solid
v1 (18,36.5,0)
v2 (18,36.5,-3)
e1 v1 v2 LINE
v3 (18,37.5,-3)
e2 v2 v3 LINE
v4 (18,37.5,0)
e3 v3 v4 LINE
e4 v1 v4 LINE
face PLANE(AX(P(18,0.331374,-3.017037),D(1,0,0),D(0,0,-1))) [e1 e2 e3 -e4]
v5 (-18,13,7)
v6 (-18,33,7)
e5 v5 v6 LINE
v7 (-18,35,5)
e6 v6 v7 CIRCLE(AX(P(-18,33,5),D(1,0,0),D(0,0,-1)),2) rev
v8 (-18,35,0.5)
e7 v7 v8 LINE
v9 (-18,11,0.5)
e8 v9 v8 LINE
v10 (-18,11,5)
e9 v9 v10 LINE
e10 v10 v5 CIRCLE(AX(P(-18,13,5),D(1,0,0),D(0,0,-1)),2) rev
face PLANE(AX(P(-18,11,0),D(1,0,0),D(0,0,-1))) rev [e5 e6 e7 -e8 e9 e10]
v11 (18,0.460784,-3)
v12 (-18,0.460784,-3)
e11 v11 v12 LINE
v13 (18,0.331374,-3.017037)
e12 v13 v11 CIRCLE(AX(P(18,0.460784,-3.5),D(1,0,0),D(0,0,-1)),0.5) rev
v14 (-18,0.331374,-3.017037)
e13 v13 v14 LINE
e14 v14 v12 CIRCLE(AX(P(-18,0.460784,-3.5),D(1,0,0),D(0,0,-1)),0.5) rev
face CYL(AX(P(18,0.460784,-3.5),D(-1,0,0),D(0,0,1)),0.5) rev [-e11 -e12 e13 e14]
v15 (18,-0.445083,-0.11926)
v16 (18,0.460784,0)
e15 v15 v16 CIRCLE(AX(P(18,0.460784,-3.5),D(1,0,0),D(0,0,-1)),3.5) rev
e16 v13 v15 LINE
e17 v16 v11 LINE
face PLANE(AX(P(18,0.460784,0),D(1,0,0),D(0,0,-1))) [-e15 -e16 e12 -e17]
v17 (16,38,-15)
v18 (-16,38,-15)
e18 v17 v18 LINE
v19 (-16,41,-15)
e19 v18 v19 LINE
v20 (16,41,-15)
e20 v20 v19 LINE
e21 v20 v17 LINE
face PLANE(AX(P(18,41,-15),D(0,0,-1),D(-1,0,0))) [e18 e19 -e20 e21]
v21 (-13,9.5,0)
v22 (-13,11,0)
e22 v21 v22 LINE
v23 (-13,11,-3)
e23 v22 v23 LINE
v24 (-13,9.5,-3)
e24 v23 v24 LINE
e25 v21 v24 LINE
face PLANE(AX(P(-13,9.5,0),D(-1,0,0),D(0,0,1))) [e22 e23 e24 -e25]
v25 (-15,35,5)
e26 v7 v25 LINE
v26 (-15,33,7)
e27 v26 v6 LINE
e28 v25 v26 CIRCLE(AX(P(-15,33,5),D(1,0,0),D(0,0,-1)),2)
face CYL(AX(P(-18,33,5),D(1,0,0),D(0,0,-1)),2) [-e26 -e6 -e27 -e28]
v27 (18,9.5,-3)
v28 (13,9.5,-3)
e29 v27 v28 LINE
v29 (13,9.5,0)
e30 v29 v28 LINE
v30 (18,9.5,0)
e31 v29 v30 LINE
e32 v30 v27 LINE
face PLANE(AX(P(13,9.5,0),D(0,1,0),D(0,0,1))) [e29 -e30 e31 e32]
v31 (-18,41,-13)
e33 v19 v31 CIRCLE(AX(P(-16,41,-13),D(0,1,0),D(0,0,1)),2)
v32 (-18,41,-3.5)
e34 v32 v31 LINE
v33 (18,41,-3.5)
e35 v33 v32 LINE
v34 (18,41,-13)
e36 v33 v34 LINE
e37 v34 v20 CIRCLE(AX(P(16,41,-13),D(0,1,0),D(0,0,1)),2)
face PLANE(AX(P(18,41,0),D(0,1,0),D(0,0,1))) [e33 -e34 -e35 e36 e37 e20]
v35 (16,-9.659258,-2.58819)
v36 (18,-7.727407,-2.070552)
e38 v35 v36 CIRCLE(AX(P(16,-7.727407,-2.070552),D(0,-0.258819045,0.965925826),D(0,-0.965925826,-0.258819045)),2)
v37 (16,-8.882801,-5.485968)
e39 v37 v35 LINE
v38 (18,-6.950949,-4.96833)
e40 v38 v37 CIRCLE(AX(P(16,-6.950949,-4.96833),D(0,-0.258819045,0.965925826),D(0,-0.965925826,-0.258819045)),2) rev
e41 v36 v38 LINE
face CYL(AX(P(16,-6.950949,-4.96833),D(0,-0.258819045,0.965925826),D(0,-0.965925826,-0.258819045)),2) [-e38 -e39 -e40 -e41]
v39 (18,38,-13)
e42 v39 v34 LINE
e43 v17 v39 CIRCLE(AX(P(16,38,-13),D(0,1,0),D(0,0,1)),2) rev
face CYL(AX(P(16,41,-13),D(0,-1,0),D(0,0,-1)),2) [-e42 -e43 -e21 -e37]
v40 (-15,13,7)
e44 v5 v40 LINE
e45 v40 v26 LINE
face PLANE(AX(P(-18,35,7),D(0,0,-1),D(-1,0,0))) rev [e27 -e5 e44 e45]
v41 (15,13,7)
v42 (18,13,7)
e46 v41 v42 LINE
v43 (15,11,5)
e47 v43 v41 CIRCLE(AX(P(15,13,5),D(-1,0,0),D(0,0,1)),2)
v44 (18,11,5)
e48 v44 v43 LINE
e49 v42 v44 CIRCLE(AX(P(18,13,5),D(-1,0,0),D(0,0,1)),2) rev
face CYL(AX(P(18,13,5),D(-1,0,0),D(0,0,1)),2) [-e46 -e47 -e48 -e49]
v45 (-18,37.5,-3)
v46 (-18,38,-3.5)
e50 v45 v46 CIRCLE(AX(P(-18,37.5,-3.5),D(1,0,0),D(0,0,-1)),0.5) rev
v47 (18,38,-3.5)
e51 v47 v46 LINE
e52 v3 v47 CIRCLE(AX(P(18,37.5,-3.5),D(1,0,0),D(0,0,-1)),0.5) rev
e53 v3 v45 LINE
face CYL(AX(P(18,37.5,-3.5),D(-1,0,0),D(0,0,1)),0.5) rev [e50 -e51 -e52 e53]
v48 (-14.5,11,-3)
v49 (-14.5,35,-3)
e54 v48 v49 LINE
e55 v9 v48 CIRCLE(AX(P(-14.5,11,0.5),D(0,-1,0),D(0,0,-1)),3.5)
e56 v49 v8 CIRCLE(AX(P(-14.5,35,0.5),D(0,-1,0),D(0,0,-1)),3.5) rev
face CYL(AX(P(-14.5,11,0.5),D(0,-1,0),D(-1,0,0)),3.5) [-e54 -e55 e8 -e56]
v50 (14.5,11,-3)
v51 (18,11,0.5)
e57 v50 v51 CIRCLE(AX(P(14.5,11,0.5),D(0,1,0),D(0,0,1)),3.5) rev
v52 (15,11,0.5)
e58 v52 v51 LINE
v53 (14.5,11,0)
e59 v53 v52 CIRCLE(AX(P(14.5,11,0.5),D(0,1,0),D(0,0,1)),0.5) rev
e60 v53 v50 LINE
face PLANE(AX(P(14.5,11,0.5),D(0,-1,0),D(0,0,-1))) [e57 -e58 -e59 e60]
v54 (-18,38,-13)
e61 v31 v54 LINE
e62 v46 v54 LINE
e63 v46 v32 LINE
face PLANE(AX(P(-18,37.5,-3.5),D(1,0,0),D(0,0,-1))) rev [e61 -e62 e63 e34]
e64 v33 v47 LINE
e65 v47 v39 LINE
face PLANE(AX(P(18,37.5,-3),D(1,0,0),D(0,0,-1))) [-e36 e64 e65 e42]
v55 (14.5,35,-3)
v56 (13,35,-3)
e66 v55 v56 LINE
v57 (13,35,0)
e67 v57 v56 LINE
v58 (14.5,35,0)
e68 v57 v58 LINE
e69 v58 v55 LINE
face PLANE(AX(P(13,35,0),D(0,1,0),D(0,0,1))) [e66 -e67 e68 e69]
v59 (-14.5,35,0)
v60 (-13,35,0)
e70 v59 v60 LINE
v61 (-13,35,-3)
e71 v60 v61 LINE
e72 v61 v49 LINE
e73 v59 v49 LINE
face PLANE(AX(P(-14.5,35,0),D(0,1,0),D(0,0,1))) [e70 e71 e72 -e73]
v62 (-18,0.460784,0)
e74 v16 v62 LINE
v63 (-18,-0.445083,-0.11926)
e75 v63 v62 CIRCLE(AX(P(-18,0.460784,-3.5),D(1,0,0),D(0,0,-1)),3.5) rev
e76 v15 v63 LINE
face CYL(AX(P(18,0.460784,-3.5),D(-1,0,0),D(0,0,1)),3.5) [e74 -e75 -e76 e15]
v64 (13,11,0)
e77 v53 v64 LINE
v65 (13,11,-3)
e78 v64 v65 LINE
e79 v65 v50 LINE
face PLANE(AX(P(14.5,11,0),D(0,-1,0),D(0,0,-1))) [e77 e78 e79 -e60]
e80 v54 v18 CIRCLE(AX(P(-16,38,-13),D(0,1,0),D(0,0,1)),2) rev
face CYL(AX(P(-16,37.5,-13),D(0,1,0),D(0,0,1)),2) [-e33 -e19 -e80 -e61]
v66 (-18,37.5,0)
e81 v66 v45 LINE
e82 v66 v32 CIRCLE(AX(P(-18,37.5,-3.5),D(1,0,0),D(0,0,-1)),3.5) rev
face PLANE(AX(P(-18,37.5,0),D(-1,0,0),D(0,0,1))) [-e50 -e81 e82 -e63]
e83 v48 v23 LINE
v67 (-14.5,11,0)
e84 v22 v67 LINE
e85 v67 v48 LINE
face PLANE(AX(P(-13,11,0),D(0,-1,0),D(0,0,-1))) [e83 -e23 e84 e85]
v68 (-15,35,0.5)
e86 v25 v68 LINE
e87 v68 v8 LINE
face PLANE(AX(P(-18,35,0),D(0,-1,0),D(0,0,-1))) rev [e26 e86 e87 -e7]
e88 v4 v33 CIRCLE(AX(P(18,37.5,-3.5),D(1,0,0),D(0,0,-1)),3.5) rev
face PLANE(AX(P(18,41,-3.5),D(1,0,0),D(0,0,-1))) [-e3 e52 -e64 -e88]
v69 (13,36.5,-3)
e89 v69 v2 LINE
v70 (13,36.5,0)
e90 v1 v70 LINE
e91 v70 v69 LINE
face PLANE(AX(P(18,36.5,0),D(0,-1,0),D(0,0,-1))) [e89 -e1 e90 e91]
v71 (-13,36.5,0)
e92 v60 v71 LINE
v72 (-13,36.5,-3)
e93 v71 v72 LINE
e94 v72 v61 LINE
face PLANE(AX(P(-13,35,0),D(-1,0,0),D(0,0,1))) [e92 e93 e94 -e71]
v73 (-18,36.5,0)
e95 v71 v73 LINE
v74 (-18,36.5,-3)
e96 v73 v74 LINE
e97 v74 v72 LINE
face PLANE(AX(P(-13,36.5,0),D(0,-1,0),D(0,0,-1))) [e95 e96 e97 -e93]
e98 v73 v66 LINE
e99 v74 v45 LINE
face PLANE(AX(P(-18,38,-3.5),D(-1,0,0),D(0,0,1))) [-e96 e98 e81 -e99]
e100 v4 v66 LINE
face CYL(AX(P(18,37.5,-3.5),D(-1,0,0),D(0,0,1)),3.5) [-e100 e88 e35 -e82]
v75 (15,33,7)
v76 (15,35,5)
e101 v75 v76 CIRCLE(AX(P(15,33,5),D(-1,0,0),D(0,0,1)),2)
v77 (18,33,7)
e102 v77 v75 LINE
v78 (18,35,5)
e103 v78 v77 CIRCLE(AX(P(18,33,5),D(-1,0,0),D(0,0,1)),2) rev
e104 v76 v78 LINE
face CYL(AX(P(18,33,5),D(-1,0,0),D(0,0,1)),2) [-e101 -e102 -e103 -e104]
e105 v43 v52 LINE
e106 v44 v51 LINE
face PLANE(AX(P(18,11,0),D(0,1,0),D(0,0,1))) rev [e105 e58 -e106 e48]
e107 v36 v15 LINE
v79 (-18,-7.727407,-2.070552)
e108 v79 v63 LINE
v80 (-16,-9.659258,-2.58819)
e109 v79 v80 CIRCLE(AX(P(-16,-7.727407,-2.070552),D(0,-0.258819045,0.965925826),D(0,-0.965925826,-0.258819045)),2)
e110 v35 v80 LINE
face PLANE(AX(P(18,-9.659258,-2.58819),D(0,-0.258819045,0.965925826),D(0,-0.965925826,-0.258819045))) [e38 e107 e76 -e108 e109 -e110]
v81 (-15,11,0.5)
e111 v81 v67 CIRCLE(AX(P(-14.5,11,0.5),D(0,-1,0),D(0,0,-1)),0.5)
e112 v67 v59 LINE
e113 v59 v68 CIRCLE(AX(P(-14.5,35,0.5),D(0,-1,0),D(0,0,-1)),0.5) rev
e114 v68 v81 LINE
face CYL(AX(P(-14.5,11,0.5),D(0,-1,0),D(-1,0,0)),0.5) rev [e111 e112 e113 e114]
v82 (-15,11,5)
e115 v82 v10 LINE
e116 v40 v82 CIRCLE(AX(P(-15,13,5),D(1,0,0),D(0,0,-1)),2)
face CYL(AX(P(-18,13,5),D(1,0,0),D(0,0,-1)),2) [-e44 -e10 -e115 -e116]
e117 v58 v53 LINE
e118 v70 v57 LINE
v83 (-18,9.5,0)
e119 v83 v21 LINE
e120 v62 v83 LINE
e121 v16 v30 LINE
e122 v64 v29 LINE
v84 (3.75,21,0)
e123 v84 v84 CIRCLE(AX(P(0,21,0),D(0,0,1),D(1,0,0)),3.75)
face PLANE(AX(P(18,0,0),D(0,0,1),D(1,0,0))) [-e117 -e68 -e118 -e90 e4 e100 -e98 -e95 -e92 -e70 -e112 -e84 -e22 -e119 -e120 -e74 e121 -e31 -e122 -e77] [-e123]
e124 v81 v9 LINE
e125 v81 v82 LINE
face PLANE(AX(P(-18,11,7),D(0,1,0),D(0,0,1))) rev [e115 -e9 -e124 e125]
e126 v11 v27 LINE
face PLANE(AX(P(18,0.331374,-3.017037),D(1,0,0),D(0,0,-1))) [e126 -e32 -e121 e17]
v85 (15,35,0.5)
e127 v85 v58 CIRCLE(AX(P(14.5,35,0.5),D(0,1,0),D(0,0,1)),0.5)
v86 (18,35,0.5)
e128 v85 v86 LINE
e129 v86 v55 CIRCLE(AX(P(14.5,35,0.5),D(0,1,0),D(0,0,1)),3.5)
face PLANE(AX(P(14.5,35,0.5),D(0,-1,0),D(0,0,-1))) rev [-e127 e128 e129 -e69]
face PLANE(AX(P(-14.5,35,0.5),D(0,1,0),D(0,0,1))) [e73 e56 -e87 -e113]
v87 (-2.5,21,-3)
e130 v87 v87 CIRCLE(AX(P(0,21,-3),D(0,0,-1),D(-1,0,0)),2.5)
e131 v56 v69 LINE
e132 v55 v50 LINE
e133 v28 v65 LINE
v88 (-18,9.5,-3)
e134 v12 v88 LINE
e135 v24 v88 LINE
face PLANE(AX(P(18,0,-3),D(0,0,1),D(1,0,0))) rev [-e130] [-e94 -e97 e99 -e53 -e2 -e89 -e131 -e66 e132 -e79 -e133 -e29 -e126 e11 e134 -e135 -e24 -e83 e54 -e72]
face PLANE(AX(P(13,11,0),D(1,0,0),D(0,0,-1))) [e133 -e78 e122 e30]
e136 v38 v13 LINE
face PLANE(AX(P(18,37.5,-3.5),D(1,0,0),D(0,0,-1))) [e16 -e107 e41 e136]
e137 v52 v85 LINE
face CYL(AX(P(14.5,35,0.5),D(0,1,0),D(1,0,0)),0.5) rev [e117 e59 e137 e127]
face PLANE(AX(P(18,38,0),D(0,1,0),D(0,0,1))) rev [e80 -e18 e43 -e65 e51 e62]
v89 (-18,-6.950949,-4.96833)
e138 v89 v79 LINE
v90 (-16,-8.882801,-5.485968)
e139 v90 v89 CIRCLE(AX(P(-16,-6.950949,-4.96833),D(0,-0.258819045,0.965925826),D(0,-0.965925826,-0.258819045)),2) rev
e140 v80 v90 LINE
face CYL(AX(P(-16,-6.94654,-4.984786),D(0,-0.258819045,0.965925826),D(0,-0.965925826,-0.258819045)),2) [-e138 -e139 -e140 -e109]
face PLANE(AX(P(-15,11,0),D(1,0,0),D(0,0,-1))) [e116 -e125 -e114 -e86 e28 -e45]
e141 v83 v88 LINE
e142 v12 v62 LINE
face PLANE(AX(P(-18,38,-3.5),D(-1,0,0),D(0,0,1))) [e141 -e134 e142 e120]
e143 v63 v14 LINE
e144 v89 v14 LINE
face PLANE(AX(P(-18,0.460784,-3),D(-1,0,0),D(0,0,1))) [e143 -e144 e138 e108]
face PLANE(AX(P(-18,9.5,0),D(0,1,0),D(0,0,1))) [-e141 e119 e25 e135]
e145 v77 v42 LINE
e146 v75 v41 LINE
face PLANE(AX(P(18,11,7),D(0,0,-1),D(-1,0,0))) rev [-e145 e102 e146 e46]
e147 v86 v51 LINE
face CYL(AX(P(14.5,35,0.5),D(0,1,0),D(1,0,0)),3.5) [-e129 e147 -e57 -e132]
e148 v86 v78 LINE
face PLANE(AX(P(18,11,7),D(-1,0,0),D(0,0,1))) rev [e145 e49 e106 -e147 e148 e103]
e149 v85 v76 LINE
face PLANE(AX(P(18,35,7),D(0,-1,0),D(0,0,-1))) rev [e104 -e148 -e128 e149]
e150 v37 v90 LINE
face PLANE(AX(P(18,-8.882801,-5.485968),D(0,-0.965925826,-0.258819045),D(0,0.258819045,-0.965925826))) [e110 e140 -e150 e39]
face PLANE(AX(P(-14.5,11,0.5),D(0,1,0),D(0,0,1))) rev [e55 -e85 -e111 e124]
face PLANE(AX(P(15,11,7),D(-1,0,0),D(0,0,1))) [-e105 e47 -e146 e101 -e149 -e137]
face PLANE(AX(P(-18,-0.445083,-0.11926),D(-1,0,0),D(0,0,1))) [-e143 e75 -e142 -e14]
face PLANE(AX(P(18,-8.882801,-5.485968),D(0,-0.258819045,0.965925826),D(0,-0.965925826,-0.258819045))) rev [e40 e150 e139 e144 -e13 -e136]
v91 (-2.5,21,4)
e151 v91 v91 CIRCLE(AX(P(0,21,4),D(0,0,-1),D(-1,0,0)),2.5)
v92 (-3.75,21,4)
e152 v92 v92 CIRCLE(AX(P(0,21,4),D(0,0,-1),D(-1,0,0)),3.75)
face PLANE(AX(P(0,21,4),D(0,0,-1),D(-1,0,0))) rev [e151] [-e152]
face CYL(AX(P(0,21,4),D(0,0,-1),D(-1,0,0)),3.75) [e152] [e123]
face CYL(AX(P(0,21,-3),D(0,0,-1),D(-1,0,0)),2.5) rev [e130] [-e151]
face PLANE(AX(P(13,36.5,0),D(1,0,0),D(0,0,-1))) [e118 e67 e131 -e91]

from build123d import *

# Parameters (mm, degrees)
SM_BASE_FLANGE_1_DEPTH            = 18
SM_EDGE_FLANGE_1_STRIP_W          = 13
SM_EDGE_FLANGE_1_STRIP_H          = 3
SM_EDGE_FLANGE_1_STRIP_CUT_DEPTH  = 24
SM_EDGE_FLANGE_1_RELIEF_W         = 14.5
SM_EDGE_FLANGE_1_RELIEF_H         = 1.5
SM_EDGE_FLANGE_1_RELIEF_CUT_DEPTH = 3
SM_EDGE_FLANGE_1_DEPTH            = 24
SM_EDGE_FLANGE_2_STRIP_W          = 13
SM_EDGE_FLANGE_2_STRIP_H          = 3
SM_EDGE_FLANGE_2_STRIP_CUT_DEPTH  = 24
SM_EDGE_FLANGE_2_RELIEF_W         = 14.5
SM_EDGE_FLANGE_2_RELIEF_H         = 1.5
SM_EDGE_FLANGE_2_RELIEF_CUT_DEPTH = 3
SM_EDGE_FLANGE_2_DEPTH            = 24
SKETCH_12_R                       = 3.75
EXTRUDE_1_DEPTH                   = 7
HOLE_WIZARD_M6_1_D                = 5
HOLE_WIZARD_M6_1_DEPTH            = 15
HOLE_WIZARD_M6_1_TIP              = 1.502151548
FILLET_1_R                        = 2


# Sheet-metal steps are written as plain solids
with BuildPart() as part:
    # 草图2 → 基体-法兰1 (new, symmetric)
    with BuildSketch(Plane(origin=(0, 0, 0), x_dir=(0, 0, -1), z_dir=(1, 0, 0))):
        with BuildLine():
            Line((2.588190451, -9.659258263), (0.119259608, -0.445082916))
            ThreePointArc((0.119259608, -0.445082916), (0.029942985, 0.003942069), (0, 0.460783742))
            Line((0, 0.460783742), (0, 37.5))
            ThreePointArc((0, 37.5), (1.025126266, 39.974873734), (3.5, 41))
            Line((3.5, 41), (15, 41))
            Line((15, 41), (15, 38))
            Line((15, 38), (3.5, 38))
            ThreePointArc((3.5, 38), (3.146446609, 37.853553391), (3, 37.5))
            Line((3, 37.5), (3, 0.460783742))
            ThreePointArc((3, 0.460783742), (3.004277569, 0.395520645), (3.017037087, 0.331374219))
            Line((3.017037087, 0.331374219), (5.48596793, -8.882801128))
            Line((5.48596793, -8.882801128), (2.588190451, -9.659258263))
        make_face()
    extrude(amount=SM_BASE_FLANGE_1_DEPTH, both=True)

    # 边线-法兰1 strip (across the edge) → 边线-法兰1 strip cut (cut)
    with BuildSketch(Plane(origin=(18, 11, 0), x_dir=(-1, 0, 0), z_dir=(0, 1, 0))):
        with Locations((-3, -1.5)):
            Rectangle(SM_EDGE_FLANGE_1_STRIP_W, SM_EDGE_FLANGE_1_STRIP_H)
    extrude(amount=SM_EDGE_FLANGE_1_STRIP_CUT_DEPTH, mode=Mode.SUBTRACT)

    # 边线-法兰1 relief (on the sheet) → 边线-法兰1 relief cut (cut)
    with BuildSketch(Plane(origin=(14.5, 11, 0), x_dir=(-1, 0, 0), z_dir=(0, 0, 1))):
        with Locations((-5.75, 0.75)):
            Rectangle(SM_EDGE_FLANGE_1_RELIEF_W, SM_EDGE_FLANGE_1_RELIEF_H)
        with Locations((-5.75, -24.75)):
            Rectangle(SM_EDGE_FLANGE_1_RELIEF_W, SM_EDGE_FLANGE_1_RELIEF_H)
    extrude(amount=-SM_EDGE_FLANGE_1_RELIEF_CUT_DEPTH, mode=Mode.SUBTRACT)

    # 边线-法兰1 section (across the edge) → 边线-法兰1 (add)
    with BuildSketch(Plane(origin=(18, 11, 0), x_dir=(-1, 0, 0), z_dir=(0, 1, 0))):
        with BuildLine():
            Line((0, 0.5), (0, 7))
            Line((0, 7), (3, 7))
            Line((3, 7), (3, 0.5))
            ThreePointArc((3, 0.5), (3.146446609, 0.146446609), (3.5, 0))
            Line((3.5, 0), (3.5, -3))
            ThreePointArc((3.5, -3), (1.025126266, -1.974873734), (0, 0.5))
        make_face()
    extrude(amount=SM_EDGE_FLANGE_1_DEPTH)

    # 边线-法兰2 strip (across the edge) → 边线-法兰2 strip cut (cut)
    with BuildSketch(Plane(origin=(-18, 35, 0), x_dir=(1, 0, 0), z_dir=(0, -1, 0))):
        with Locations((-3, -1.5)):
            Rectangle(SM_EDGE_FLANGE_2_STRIP_W, SM_EDGE_FLANGE_2_STRIP_H)
    extrude(amount=SM_EDGE_FLANGE_2_STRIP_CUT_DEPTH, mode=Mode.SUBTRACT)

    # 边线-法兰2 relief (on the sheet) → 边线-法兰2 relief cut (cut)
    with BuildSketch(Plane(origin=(-14.5, 35, 0), x_dir=(1, 0, 0), z_dir=(0, 0, 1))):
        with Locations((-5.75, 0.75)):
            Rectangle(SM_EDGE_FLANGE_2_RELIEF_W, SM_EDGE_FLANGE_2_RELIEF_H)
        with Locations((-5.75, -24.75)):
            Rectangle(SM_EDGE_FLANGE_2_RELIEF_W, SM_EDGE_FLANGE_2_RELIEF_H)
    extrude(amount=-SM_EDGE_FLANGE_2_RELIEF_CUT_DEPTH, mode=Mode.SUBTRACT)

    # 边线-法兰2 section (across the edge) → 边线-法兰2 (add)
    with BuildSketch(Plane(origin=(-18, 35, 0), x_dir=(1, 0, 0), z_dir=(0, -1, 0))):
        with BuildLine():
            Line((0, 0.5), (0, 7))
            Line((0, 7), (3, 7))
            Line((3, 7), (3, 0.5))
            ThreePointArc((3, 0.5), (3.146446609, 0.146446609), (3.5, 0))
            Line((3.5, 0), (3.5, -3))
            ThreePointArc((3.5, -3), (1.025126266, -1.974873734), (0, 0.5))
        make_face()
    extrude(amount=SM_EDGE_FLANGE_2_DEPTH)

    # 草图12 → 凸台-拉伸1 (add)
    with BuildSketch(Plane(origin=(0, 0, -3), x_dir=(-1, 0, 0), z_dir=(0, 0, -1))):
        with Locations((0, 21)):
            Circle(SKETCH_12_R)
    extrude(amount=-EXTRUDE_1_DEPTH)

    # M6 螺纹孔1
    with Locations(Plane(origin=(0, 0, -3), x_dir=(-1, 0, 0), z_dir=(0, 0, -1))):
        with Locations((0, 21)):
            Hole(HOLE_WIZARD_M6_1_D / 2, depth=HOLE_WIZARD_M6_1_DEPTH)
            with Locations((0, 0, -(HOLE_WIZARD_M6_1_DEPTH + HOLE_WIZARD_M6_1_TIP / 2))):  # 118° drill point
                Cone(0, HOLE_WIZARD_M6_1_D / 2, HOLE_WIZARD_M6_1_TIP, mode=Mode.SUBTRACT)

    # 圆角1
    fillet_1_edges = [part.edges().sort_by_distance(p)[0] for p in [
        (-18, -9.271029695, -4.03707919),
        (-16.5, 35, 7),
        (-16.5, 11, 7),
        (-18, 39.5, -15),
        (18, -9.271029695, -4.03707919),
        (18, 39.5, -15),
        (16.5, 11, 7),
        (16.5, 35, 7),
    ]]
    fillet(fillet_1_edges, radius=FILLET_1_R)


solid = part.part
